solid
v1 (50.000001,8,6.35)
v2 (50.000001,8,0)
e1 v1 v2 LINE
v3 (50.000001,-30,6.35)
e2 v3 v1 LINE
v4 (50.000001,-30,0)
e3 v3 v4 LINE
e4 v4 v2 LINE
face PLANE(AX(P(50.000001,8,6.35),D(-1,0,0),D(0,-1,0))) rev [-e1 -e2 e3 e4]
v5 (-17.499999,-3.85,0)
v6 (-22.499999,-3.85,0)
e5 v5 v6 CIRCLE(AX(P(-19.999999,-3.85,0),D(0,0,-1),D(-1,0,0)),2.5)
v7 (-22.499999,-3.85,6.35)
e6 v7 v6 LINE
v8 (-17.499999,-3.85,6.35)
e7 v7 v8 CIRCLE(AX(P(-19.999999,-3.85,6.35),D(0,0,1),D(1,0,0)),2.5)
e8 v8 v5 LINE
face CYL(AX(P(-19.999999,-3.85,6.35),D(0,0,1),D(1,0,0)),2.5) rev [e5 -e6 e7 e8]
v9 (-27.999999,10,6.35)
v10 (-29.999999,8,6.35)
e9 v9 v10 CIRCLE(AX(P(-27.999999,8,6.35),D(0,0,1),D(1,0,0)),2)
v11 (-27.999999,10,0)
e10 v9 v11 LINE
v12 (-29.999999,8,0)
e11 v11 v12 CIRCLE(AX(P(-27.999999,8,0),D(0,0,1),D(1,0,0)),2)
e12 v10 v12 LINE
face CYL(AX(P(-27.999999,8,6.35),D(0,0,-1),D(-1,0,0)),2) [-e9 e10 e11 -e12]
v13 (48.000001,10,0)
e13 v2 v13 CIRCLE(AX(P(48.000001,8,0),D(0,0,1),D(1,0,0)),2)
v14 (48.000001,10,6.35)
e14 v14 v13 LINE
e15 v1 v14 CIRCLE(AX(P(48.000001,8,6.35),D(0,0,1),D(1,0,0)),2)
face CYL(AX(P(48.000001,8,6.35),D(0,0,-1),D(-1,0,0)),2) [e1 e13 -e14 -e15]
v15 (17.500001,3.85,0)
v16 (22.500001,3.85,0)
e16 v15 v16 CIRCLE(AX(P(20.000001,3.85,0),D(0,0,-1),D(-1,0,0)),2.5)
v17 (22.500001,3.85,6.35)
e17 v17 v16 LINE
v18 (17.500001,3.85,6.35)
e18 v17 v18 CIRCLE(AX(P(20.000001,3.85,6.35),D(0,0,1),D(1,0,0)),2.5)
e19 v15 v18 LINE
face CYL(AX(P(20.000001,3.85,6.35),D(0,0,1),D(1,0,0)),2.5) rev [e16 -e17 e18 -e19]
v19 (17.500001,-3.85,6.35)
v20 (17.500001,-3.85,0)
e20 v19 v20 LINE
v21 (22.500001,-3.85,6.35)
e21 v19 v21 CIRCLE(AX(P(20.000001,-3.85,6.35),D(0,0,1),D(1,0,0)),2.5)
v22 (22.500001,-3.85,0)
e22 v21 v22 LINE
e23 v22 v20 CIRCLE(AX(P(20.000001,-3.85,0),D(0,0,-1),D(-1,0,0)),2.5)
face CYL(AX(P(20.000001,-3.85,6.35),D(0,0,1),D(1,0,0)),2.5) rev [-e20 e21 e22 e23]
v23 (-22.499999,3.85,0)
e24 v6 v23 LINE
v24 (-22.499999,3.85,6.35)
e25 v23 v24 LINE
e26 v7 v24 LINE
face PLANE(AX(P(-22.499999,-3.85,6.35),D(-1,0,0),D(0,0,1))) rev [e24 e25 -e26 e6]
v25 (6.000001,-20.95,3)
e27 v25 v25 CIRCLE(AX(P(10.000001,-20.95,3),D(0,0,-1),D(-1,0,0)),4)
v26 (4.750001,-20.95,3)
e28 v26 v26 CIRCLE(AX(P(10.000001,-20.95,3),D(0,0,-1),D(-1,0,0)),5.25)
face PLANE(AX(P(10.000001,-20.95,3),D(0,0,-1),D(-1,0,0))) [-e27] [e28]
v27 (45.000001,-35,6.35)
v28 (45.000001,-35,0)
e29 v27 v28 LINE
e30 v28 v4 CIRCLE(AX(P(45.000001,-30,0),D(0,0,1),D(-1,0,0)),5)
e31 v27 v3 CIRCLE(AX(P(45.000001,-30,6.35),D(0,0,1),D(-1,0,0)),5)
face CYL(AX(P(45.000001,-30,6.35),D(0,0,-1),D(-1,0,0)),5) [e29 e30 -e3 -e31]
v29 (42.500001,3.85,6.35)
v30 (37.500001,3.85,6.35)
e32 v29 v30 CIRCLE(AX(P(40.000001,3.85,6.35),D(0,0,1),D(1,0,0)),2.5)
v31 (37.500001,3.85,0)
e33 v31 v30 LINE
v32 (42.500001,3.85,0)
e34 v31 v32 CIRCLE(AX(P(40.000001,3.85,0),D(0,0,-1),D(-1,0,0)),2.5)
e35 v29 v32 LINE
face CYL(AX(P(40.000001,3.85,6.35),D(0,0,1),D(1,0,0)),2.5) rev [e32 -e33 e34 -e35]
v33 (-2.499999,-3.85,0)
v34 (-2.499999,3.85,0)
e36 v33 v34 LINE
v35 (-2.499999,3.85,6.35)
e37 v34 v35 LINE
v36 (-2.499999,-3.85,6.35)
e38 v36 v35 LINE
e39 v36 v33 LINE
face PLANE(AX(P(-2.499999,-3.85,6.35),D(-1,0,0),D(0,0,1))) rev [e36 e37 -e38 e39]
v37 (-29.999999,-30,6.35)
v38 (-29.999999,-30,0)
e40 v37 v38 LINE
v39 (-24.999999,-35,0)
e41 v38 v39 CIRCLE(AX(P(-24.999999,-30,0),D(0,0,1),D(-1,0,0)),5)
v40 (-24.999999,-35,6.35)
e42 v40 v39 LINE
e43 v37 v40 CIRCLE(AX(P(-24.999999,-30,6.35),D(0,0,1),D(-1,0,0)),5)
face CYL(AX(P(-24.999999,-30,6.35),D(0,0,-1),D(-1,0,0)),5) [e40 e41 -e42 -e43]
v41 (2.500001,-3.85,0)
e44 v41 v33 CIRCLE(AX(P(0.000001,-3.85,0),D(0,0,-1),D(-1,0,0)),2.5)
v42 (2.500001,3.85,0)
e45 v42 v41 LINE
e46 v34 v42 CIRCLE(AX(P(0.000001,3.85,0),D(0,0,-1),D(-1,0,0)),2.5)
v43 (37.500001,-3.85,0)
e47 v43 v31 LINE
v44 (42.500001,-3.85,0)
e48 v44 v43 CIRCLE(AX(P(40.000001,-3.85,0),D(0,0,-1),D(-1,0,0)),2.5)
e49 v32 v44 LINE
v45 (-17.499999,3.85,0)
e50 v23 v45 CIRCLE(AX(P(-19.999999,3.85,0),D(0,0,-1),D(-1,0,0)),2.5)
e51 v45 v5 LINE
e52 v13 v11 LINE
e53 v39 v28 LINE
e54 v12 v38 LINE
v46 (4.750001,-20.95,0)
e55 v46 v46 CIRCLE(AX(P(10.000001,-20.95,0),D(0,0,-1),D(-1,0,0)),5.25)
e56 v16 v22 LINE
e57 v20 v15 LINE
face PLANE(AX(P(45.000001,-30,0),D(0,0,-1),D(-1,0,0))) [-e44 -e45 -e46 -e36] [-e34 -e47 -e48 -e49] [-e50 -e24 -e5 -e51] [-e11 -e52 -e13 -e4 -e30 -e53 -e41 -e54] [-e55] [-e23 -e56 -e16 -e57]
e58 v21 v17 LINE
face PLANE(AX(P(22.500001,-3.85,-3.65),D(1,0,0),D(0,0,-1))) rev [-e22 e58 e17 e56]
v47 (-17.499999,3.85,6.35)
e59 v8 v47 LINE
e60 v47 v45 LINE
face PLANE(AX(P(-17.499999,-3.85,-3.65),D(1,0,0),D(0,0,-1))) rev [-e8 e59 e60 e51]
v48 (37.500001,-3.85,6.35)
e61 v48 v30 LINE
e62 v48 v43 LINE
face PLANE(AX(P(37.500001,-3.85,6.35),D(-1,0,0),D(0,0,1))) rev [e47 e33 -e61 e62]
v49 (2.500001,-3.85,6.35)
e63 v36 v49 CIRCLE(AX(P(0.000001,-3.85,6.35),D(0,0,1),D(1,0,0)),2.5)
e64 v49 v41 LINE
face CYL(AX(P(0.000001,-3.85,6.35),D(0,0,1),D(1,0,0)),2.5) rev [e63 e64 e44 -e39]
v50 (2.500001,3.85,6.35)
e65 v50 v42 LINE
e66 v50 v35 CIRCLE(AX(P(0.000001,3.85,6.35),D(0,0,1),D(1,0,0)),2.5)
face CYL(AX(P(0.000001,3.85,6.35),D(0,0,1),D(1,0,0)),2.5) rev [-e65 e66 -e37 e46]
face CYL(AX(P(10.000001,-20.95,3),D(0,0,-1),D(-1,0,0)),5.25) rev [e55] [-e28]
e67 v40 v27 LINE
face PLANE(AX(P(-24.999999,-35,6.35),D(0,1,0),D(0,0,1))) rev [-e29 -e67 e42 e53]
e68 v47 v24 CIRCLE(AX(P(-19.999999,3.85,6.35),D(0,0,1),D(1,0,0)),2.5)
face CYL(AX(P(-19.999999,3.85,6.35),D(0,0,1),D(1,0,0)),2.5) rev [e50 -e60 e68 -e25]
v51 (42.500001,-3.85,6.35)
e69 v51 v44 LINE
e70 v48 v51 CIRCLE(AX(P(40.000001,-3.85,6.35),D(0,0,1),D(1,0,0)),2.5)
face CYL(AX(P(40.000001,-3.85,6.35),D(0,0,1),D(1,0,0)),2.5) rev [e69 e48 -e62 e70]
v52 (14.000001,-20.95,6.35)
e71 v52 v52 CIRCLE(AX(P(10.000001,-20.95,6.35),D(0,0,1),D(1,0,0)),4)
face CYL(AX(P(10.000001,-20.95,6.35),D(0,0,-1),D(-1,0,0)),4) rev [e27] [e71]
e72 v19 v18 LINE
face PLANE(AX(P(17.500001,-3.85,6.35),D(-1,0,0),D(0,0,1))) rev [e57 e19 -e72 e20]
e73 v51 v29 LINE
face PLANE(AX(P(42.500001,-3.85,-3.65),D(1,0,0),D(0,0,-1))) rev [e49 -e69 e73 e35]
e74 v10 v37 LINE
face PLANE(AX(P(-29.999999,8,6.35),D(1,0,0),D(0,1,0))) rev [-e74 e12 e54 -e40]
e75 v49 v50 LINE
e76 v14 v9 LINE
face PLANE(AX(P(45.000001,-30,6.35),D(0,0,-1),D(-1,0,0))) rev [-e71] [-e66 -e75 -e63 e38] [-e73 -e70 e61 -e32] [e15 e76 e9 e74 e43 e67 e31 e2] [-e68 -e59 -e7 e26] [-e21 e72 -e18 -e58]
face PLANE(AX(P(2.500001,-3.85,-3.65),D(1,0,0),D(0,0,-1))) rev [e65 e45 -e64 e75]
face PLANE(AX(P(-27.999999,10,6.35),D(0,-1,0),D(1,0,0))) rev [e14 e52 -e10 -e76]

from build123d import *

# Parameters (mm, degrees)
SKETCH1_R                 = 4
BOSS_EXTRUDE1_DEPTH       = 6.35
F_5_0MM_DOWEL_SLOT1_DEPTH = 6.35
SKETCH5_R                 = 5.25
CUT_EXTRUDE1_DEPTH        = 3


# Read off the part's stored shape, not the designer's step: Ø5.0mm Dowel Slot1
with BuildPart() as part:
    # Sketch1 → Boss-Extrude1 (new body)
    with BuildSketch(Plane.XY):
        with BuildLine():
            Line((-27.999999098, 10), (48.000000902, 10))
            ThreePointArc((48.000000902, 10), (49.414214465, 9.414213562), (50.000000902, 8))
            Line((50.000000902, 8), (50.000000902, -30))
            ThreePointArc((50.000000902, -30), (48.535534808, -33.535533906), (45.000000902, -35))
            Line((45.000000902, -35), (-24.999999098, -35))
            ThreePointArc((-24.999999098, -35), (-28.535533003, -33.535533906), (-29.999999098, -30))
            Line((-29.999999098, -30), (-29.999999098, 8))
            ThreePointArc((-29.999999098, 8), (-29.41421266, 9.414213562), (-27.999999098, 10))
        make_face()
        with Locations((10.000000902, -20.95)):
            Circle(SKETCH1_R, mode=Mode.SUBTRACT)
    extrude(amount=BOSS_EXTRUDE1_DEPTH)

    # Ø5.0mm Dowel Slot1 outline → Ø5.0mm Dowel Slot1 (cut)
    with BuildSketch(Plane.XY):
        with BuildLine():
            Line((22.500000902, -3.85), (22.500000902, 3.85))
            ThreePointArc((22.500000902, 3.85), (20.000000902, 6.35), (17.500000902, 3.85))
            Line((17.500000902, 3.85), (17.500000902, -3.85))
            ThreePointArc((17.500000902, -3.85), (20.000000902, -6.35), (22.500000902, -3.85))
        make_face()
        with BuildLine():
            Line((-17.499999098, -3.85), (-17.499999098, 3.85))
            ThreePointArc((-17.499999098, 3.85), (-19.999999098, 6.35), (-22.499999098, 3.85))
            Line((-22.499999098, 3.85), (-22.499999098, -3.85))
            ThreePointArc((-22.499999098, -3.85), (-19.999999098, -6.35), (-17.499999098, -3.85))
        make_face()
        with BuildLine():
            Line((2.500000902, -3.85), (2.500000902, 3.85))
            ThreePointArc((2.500000902, 3.85), (9.02e-07, 6.35), (-2.499999098, 3.85))
            Line((-2.499999098, 3.85), (-2.499999098, -3.85))
            ThreePointArc((-2.499999098, -3.85), (9.02e-07, -6.35), (2.500000902, -3.85))
        make_face()
        with BuildLine():
            Line((42.500000902, -3.85), (42.500000902, 3.85))
            ThreePointArc((42.500000902, 3.85), (40.000000902, 6.35), (37.500000902, 3.85))
            Line((37.500000902, 3.85), (37.500000902, -3.85))
            ThreePointArc((37.500000902, -3.85), (40.000000902, -6.35), (42.500000902, -3.85))
        make_face()
    extrude(amount=F_5_0MM_DOWEL_SLOT1_DEPTH, mode=Mode.SUBTRACT)

    # Sketch5 → Cut-Extrude1 (cut)
    with BuildSketch(Plane(origin=(0, 0, 0), x_dir=(-1, 0, 0), z_dir=(0, 0, -1))):
        with Locations((-10.000000902, -20.95)):
            Circle(SKETCH5_R)
    extrude(amount=-CUT_EXTRUDE1_DEPTH, mode=Mode.SUBTRACT)


solid = part.part
